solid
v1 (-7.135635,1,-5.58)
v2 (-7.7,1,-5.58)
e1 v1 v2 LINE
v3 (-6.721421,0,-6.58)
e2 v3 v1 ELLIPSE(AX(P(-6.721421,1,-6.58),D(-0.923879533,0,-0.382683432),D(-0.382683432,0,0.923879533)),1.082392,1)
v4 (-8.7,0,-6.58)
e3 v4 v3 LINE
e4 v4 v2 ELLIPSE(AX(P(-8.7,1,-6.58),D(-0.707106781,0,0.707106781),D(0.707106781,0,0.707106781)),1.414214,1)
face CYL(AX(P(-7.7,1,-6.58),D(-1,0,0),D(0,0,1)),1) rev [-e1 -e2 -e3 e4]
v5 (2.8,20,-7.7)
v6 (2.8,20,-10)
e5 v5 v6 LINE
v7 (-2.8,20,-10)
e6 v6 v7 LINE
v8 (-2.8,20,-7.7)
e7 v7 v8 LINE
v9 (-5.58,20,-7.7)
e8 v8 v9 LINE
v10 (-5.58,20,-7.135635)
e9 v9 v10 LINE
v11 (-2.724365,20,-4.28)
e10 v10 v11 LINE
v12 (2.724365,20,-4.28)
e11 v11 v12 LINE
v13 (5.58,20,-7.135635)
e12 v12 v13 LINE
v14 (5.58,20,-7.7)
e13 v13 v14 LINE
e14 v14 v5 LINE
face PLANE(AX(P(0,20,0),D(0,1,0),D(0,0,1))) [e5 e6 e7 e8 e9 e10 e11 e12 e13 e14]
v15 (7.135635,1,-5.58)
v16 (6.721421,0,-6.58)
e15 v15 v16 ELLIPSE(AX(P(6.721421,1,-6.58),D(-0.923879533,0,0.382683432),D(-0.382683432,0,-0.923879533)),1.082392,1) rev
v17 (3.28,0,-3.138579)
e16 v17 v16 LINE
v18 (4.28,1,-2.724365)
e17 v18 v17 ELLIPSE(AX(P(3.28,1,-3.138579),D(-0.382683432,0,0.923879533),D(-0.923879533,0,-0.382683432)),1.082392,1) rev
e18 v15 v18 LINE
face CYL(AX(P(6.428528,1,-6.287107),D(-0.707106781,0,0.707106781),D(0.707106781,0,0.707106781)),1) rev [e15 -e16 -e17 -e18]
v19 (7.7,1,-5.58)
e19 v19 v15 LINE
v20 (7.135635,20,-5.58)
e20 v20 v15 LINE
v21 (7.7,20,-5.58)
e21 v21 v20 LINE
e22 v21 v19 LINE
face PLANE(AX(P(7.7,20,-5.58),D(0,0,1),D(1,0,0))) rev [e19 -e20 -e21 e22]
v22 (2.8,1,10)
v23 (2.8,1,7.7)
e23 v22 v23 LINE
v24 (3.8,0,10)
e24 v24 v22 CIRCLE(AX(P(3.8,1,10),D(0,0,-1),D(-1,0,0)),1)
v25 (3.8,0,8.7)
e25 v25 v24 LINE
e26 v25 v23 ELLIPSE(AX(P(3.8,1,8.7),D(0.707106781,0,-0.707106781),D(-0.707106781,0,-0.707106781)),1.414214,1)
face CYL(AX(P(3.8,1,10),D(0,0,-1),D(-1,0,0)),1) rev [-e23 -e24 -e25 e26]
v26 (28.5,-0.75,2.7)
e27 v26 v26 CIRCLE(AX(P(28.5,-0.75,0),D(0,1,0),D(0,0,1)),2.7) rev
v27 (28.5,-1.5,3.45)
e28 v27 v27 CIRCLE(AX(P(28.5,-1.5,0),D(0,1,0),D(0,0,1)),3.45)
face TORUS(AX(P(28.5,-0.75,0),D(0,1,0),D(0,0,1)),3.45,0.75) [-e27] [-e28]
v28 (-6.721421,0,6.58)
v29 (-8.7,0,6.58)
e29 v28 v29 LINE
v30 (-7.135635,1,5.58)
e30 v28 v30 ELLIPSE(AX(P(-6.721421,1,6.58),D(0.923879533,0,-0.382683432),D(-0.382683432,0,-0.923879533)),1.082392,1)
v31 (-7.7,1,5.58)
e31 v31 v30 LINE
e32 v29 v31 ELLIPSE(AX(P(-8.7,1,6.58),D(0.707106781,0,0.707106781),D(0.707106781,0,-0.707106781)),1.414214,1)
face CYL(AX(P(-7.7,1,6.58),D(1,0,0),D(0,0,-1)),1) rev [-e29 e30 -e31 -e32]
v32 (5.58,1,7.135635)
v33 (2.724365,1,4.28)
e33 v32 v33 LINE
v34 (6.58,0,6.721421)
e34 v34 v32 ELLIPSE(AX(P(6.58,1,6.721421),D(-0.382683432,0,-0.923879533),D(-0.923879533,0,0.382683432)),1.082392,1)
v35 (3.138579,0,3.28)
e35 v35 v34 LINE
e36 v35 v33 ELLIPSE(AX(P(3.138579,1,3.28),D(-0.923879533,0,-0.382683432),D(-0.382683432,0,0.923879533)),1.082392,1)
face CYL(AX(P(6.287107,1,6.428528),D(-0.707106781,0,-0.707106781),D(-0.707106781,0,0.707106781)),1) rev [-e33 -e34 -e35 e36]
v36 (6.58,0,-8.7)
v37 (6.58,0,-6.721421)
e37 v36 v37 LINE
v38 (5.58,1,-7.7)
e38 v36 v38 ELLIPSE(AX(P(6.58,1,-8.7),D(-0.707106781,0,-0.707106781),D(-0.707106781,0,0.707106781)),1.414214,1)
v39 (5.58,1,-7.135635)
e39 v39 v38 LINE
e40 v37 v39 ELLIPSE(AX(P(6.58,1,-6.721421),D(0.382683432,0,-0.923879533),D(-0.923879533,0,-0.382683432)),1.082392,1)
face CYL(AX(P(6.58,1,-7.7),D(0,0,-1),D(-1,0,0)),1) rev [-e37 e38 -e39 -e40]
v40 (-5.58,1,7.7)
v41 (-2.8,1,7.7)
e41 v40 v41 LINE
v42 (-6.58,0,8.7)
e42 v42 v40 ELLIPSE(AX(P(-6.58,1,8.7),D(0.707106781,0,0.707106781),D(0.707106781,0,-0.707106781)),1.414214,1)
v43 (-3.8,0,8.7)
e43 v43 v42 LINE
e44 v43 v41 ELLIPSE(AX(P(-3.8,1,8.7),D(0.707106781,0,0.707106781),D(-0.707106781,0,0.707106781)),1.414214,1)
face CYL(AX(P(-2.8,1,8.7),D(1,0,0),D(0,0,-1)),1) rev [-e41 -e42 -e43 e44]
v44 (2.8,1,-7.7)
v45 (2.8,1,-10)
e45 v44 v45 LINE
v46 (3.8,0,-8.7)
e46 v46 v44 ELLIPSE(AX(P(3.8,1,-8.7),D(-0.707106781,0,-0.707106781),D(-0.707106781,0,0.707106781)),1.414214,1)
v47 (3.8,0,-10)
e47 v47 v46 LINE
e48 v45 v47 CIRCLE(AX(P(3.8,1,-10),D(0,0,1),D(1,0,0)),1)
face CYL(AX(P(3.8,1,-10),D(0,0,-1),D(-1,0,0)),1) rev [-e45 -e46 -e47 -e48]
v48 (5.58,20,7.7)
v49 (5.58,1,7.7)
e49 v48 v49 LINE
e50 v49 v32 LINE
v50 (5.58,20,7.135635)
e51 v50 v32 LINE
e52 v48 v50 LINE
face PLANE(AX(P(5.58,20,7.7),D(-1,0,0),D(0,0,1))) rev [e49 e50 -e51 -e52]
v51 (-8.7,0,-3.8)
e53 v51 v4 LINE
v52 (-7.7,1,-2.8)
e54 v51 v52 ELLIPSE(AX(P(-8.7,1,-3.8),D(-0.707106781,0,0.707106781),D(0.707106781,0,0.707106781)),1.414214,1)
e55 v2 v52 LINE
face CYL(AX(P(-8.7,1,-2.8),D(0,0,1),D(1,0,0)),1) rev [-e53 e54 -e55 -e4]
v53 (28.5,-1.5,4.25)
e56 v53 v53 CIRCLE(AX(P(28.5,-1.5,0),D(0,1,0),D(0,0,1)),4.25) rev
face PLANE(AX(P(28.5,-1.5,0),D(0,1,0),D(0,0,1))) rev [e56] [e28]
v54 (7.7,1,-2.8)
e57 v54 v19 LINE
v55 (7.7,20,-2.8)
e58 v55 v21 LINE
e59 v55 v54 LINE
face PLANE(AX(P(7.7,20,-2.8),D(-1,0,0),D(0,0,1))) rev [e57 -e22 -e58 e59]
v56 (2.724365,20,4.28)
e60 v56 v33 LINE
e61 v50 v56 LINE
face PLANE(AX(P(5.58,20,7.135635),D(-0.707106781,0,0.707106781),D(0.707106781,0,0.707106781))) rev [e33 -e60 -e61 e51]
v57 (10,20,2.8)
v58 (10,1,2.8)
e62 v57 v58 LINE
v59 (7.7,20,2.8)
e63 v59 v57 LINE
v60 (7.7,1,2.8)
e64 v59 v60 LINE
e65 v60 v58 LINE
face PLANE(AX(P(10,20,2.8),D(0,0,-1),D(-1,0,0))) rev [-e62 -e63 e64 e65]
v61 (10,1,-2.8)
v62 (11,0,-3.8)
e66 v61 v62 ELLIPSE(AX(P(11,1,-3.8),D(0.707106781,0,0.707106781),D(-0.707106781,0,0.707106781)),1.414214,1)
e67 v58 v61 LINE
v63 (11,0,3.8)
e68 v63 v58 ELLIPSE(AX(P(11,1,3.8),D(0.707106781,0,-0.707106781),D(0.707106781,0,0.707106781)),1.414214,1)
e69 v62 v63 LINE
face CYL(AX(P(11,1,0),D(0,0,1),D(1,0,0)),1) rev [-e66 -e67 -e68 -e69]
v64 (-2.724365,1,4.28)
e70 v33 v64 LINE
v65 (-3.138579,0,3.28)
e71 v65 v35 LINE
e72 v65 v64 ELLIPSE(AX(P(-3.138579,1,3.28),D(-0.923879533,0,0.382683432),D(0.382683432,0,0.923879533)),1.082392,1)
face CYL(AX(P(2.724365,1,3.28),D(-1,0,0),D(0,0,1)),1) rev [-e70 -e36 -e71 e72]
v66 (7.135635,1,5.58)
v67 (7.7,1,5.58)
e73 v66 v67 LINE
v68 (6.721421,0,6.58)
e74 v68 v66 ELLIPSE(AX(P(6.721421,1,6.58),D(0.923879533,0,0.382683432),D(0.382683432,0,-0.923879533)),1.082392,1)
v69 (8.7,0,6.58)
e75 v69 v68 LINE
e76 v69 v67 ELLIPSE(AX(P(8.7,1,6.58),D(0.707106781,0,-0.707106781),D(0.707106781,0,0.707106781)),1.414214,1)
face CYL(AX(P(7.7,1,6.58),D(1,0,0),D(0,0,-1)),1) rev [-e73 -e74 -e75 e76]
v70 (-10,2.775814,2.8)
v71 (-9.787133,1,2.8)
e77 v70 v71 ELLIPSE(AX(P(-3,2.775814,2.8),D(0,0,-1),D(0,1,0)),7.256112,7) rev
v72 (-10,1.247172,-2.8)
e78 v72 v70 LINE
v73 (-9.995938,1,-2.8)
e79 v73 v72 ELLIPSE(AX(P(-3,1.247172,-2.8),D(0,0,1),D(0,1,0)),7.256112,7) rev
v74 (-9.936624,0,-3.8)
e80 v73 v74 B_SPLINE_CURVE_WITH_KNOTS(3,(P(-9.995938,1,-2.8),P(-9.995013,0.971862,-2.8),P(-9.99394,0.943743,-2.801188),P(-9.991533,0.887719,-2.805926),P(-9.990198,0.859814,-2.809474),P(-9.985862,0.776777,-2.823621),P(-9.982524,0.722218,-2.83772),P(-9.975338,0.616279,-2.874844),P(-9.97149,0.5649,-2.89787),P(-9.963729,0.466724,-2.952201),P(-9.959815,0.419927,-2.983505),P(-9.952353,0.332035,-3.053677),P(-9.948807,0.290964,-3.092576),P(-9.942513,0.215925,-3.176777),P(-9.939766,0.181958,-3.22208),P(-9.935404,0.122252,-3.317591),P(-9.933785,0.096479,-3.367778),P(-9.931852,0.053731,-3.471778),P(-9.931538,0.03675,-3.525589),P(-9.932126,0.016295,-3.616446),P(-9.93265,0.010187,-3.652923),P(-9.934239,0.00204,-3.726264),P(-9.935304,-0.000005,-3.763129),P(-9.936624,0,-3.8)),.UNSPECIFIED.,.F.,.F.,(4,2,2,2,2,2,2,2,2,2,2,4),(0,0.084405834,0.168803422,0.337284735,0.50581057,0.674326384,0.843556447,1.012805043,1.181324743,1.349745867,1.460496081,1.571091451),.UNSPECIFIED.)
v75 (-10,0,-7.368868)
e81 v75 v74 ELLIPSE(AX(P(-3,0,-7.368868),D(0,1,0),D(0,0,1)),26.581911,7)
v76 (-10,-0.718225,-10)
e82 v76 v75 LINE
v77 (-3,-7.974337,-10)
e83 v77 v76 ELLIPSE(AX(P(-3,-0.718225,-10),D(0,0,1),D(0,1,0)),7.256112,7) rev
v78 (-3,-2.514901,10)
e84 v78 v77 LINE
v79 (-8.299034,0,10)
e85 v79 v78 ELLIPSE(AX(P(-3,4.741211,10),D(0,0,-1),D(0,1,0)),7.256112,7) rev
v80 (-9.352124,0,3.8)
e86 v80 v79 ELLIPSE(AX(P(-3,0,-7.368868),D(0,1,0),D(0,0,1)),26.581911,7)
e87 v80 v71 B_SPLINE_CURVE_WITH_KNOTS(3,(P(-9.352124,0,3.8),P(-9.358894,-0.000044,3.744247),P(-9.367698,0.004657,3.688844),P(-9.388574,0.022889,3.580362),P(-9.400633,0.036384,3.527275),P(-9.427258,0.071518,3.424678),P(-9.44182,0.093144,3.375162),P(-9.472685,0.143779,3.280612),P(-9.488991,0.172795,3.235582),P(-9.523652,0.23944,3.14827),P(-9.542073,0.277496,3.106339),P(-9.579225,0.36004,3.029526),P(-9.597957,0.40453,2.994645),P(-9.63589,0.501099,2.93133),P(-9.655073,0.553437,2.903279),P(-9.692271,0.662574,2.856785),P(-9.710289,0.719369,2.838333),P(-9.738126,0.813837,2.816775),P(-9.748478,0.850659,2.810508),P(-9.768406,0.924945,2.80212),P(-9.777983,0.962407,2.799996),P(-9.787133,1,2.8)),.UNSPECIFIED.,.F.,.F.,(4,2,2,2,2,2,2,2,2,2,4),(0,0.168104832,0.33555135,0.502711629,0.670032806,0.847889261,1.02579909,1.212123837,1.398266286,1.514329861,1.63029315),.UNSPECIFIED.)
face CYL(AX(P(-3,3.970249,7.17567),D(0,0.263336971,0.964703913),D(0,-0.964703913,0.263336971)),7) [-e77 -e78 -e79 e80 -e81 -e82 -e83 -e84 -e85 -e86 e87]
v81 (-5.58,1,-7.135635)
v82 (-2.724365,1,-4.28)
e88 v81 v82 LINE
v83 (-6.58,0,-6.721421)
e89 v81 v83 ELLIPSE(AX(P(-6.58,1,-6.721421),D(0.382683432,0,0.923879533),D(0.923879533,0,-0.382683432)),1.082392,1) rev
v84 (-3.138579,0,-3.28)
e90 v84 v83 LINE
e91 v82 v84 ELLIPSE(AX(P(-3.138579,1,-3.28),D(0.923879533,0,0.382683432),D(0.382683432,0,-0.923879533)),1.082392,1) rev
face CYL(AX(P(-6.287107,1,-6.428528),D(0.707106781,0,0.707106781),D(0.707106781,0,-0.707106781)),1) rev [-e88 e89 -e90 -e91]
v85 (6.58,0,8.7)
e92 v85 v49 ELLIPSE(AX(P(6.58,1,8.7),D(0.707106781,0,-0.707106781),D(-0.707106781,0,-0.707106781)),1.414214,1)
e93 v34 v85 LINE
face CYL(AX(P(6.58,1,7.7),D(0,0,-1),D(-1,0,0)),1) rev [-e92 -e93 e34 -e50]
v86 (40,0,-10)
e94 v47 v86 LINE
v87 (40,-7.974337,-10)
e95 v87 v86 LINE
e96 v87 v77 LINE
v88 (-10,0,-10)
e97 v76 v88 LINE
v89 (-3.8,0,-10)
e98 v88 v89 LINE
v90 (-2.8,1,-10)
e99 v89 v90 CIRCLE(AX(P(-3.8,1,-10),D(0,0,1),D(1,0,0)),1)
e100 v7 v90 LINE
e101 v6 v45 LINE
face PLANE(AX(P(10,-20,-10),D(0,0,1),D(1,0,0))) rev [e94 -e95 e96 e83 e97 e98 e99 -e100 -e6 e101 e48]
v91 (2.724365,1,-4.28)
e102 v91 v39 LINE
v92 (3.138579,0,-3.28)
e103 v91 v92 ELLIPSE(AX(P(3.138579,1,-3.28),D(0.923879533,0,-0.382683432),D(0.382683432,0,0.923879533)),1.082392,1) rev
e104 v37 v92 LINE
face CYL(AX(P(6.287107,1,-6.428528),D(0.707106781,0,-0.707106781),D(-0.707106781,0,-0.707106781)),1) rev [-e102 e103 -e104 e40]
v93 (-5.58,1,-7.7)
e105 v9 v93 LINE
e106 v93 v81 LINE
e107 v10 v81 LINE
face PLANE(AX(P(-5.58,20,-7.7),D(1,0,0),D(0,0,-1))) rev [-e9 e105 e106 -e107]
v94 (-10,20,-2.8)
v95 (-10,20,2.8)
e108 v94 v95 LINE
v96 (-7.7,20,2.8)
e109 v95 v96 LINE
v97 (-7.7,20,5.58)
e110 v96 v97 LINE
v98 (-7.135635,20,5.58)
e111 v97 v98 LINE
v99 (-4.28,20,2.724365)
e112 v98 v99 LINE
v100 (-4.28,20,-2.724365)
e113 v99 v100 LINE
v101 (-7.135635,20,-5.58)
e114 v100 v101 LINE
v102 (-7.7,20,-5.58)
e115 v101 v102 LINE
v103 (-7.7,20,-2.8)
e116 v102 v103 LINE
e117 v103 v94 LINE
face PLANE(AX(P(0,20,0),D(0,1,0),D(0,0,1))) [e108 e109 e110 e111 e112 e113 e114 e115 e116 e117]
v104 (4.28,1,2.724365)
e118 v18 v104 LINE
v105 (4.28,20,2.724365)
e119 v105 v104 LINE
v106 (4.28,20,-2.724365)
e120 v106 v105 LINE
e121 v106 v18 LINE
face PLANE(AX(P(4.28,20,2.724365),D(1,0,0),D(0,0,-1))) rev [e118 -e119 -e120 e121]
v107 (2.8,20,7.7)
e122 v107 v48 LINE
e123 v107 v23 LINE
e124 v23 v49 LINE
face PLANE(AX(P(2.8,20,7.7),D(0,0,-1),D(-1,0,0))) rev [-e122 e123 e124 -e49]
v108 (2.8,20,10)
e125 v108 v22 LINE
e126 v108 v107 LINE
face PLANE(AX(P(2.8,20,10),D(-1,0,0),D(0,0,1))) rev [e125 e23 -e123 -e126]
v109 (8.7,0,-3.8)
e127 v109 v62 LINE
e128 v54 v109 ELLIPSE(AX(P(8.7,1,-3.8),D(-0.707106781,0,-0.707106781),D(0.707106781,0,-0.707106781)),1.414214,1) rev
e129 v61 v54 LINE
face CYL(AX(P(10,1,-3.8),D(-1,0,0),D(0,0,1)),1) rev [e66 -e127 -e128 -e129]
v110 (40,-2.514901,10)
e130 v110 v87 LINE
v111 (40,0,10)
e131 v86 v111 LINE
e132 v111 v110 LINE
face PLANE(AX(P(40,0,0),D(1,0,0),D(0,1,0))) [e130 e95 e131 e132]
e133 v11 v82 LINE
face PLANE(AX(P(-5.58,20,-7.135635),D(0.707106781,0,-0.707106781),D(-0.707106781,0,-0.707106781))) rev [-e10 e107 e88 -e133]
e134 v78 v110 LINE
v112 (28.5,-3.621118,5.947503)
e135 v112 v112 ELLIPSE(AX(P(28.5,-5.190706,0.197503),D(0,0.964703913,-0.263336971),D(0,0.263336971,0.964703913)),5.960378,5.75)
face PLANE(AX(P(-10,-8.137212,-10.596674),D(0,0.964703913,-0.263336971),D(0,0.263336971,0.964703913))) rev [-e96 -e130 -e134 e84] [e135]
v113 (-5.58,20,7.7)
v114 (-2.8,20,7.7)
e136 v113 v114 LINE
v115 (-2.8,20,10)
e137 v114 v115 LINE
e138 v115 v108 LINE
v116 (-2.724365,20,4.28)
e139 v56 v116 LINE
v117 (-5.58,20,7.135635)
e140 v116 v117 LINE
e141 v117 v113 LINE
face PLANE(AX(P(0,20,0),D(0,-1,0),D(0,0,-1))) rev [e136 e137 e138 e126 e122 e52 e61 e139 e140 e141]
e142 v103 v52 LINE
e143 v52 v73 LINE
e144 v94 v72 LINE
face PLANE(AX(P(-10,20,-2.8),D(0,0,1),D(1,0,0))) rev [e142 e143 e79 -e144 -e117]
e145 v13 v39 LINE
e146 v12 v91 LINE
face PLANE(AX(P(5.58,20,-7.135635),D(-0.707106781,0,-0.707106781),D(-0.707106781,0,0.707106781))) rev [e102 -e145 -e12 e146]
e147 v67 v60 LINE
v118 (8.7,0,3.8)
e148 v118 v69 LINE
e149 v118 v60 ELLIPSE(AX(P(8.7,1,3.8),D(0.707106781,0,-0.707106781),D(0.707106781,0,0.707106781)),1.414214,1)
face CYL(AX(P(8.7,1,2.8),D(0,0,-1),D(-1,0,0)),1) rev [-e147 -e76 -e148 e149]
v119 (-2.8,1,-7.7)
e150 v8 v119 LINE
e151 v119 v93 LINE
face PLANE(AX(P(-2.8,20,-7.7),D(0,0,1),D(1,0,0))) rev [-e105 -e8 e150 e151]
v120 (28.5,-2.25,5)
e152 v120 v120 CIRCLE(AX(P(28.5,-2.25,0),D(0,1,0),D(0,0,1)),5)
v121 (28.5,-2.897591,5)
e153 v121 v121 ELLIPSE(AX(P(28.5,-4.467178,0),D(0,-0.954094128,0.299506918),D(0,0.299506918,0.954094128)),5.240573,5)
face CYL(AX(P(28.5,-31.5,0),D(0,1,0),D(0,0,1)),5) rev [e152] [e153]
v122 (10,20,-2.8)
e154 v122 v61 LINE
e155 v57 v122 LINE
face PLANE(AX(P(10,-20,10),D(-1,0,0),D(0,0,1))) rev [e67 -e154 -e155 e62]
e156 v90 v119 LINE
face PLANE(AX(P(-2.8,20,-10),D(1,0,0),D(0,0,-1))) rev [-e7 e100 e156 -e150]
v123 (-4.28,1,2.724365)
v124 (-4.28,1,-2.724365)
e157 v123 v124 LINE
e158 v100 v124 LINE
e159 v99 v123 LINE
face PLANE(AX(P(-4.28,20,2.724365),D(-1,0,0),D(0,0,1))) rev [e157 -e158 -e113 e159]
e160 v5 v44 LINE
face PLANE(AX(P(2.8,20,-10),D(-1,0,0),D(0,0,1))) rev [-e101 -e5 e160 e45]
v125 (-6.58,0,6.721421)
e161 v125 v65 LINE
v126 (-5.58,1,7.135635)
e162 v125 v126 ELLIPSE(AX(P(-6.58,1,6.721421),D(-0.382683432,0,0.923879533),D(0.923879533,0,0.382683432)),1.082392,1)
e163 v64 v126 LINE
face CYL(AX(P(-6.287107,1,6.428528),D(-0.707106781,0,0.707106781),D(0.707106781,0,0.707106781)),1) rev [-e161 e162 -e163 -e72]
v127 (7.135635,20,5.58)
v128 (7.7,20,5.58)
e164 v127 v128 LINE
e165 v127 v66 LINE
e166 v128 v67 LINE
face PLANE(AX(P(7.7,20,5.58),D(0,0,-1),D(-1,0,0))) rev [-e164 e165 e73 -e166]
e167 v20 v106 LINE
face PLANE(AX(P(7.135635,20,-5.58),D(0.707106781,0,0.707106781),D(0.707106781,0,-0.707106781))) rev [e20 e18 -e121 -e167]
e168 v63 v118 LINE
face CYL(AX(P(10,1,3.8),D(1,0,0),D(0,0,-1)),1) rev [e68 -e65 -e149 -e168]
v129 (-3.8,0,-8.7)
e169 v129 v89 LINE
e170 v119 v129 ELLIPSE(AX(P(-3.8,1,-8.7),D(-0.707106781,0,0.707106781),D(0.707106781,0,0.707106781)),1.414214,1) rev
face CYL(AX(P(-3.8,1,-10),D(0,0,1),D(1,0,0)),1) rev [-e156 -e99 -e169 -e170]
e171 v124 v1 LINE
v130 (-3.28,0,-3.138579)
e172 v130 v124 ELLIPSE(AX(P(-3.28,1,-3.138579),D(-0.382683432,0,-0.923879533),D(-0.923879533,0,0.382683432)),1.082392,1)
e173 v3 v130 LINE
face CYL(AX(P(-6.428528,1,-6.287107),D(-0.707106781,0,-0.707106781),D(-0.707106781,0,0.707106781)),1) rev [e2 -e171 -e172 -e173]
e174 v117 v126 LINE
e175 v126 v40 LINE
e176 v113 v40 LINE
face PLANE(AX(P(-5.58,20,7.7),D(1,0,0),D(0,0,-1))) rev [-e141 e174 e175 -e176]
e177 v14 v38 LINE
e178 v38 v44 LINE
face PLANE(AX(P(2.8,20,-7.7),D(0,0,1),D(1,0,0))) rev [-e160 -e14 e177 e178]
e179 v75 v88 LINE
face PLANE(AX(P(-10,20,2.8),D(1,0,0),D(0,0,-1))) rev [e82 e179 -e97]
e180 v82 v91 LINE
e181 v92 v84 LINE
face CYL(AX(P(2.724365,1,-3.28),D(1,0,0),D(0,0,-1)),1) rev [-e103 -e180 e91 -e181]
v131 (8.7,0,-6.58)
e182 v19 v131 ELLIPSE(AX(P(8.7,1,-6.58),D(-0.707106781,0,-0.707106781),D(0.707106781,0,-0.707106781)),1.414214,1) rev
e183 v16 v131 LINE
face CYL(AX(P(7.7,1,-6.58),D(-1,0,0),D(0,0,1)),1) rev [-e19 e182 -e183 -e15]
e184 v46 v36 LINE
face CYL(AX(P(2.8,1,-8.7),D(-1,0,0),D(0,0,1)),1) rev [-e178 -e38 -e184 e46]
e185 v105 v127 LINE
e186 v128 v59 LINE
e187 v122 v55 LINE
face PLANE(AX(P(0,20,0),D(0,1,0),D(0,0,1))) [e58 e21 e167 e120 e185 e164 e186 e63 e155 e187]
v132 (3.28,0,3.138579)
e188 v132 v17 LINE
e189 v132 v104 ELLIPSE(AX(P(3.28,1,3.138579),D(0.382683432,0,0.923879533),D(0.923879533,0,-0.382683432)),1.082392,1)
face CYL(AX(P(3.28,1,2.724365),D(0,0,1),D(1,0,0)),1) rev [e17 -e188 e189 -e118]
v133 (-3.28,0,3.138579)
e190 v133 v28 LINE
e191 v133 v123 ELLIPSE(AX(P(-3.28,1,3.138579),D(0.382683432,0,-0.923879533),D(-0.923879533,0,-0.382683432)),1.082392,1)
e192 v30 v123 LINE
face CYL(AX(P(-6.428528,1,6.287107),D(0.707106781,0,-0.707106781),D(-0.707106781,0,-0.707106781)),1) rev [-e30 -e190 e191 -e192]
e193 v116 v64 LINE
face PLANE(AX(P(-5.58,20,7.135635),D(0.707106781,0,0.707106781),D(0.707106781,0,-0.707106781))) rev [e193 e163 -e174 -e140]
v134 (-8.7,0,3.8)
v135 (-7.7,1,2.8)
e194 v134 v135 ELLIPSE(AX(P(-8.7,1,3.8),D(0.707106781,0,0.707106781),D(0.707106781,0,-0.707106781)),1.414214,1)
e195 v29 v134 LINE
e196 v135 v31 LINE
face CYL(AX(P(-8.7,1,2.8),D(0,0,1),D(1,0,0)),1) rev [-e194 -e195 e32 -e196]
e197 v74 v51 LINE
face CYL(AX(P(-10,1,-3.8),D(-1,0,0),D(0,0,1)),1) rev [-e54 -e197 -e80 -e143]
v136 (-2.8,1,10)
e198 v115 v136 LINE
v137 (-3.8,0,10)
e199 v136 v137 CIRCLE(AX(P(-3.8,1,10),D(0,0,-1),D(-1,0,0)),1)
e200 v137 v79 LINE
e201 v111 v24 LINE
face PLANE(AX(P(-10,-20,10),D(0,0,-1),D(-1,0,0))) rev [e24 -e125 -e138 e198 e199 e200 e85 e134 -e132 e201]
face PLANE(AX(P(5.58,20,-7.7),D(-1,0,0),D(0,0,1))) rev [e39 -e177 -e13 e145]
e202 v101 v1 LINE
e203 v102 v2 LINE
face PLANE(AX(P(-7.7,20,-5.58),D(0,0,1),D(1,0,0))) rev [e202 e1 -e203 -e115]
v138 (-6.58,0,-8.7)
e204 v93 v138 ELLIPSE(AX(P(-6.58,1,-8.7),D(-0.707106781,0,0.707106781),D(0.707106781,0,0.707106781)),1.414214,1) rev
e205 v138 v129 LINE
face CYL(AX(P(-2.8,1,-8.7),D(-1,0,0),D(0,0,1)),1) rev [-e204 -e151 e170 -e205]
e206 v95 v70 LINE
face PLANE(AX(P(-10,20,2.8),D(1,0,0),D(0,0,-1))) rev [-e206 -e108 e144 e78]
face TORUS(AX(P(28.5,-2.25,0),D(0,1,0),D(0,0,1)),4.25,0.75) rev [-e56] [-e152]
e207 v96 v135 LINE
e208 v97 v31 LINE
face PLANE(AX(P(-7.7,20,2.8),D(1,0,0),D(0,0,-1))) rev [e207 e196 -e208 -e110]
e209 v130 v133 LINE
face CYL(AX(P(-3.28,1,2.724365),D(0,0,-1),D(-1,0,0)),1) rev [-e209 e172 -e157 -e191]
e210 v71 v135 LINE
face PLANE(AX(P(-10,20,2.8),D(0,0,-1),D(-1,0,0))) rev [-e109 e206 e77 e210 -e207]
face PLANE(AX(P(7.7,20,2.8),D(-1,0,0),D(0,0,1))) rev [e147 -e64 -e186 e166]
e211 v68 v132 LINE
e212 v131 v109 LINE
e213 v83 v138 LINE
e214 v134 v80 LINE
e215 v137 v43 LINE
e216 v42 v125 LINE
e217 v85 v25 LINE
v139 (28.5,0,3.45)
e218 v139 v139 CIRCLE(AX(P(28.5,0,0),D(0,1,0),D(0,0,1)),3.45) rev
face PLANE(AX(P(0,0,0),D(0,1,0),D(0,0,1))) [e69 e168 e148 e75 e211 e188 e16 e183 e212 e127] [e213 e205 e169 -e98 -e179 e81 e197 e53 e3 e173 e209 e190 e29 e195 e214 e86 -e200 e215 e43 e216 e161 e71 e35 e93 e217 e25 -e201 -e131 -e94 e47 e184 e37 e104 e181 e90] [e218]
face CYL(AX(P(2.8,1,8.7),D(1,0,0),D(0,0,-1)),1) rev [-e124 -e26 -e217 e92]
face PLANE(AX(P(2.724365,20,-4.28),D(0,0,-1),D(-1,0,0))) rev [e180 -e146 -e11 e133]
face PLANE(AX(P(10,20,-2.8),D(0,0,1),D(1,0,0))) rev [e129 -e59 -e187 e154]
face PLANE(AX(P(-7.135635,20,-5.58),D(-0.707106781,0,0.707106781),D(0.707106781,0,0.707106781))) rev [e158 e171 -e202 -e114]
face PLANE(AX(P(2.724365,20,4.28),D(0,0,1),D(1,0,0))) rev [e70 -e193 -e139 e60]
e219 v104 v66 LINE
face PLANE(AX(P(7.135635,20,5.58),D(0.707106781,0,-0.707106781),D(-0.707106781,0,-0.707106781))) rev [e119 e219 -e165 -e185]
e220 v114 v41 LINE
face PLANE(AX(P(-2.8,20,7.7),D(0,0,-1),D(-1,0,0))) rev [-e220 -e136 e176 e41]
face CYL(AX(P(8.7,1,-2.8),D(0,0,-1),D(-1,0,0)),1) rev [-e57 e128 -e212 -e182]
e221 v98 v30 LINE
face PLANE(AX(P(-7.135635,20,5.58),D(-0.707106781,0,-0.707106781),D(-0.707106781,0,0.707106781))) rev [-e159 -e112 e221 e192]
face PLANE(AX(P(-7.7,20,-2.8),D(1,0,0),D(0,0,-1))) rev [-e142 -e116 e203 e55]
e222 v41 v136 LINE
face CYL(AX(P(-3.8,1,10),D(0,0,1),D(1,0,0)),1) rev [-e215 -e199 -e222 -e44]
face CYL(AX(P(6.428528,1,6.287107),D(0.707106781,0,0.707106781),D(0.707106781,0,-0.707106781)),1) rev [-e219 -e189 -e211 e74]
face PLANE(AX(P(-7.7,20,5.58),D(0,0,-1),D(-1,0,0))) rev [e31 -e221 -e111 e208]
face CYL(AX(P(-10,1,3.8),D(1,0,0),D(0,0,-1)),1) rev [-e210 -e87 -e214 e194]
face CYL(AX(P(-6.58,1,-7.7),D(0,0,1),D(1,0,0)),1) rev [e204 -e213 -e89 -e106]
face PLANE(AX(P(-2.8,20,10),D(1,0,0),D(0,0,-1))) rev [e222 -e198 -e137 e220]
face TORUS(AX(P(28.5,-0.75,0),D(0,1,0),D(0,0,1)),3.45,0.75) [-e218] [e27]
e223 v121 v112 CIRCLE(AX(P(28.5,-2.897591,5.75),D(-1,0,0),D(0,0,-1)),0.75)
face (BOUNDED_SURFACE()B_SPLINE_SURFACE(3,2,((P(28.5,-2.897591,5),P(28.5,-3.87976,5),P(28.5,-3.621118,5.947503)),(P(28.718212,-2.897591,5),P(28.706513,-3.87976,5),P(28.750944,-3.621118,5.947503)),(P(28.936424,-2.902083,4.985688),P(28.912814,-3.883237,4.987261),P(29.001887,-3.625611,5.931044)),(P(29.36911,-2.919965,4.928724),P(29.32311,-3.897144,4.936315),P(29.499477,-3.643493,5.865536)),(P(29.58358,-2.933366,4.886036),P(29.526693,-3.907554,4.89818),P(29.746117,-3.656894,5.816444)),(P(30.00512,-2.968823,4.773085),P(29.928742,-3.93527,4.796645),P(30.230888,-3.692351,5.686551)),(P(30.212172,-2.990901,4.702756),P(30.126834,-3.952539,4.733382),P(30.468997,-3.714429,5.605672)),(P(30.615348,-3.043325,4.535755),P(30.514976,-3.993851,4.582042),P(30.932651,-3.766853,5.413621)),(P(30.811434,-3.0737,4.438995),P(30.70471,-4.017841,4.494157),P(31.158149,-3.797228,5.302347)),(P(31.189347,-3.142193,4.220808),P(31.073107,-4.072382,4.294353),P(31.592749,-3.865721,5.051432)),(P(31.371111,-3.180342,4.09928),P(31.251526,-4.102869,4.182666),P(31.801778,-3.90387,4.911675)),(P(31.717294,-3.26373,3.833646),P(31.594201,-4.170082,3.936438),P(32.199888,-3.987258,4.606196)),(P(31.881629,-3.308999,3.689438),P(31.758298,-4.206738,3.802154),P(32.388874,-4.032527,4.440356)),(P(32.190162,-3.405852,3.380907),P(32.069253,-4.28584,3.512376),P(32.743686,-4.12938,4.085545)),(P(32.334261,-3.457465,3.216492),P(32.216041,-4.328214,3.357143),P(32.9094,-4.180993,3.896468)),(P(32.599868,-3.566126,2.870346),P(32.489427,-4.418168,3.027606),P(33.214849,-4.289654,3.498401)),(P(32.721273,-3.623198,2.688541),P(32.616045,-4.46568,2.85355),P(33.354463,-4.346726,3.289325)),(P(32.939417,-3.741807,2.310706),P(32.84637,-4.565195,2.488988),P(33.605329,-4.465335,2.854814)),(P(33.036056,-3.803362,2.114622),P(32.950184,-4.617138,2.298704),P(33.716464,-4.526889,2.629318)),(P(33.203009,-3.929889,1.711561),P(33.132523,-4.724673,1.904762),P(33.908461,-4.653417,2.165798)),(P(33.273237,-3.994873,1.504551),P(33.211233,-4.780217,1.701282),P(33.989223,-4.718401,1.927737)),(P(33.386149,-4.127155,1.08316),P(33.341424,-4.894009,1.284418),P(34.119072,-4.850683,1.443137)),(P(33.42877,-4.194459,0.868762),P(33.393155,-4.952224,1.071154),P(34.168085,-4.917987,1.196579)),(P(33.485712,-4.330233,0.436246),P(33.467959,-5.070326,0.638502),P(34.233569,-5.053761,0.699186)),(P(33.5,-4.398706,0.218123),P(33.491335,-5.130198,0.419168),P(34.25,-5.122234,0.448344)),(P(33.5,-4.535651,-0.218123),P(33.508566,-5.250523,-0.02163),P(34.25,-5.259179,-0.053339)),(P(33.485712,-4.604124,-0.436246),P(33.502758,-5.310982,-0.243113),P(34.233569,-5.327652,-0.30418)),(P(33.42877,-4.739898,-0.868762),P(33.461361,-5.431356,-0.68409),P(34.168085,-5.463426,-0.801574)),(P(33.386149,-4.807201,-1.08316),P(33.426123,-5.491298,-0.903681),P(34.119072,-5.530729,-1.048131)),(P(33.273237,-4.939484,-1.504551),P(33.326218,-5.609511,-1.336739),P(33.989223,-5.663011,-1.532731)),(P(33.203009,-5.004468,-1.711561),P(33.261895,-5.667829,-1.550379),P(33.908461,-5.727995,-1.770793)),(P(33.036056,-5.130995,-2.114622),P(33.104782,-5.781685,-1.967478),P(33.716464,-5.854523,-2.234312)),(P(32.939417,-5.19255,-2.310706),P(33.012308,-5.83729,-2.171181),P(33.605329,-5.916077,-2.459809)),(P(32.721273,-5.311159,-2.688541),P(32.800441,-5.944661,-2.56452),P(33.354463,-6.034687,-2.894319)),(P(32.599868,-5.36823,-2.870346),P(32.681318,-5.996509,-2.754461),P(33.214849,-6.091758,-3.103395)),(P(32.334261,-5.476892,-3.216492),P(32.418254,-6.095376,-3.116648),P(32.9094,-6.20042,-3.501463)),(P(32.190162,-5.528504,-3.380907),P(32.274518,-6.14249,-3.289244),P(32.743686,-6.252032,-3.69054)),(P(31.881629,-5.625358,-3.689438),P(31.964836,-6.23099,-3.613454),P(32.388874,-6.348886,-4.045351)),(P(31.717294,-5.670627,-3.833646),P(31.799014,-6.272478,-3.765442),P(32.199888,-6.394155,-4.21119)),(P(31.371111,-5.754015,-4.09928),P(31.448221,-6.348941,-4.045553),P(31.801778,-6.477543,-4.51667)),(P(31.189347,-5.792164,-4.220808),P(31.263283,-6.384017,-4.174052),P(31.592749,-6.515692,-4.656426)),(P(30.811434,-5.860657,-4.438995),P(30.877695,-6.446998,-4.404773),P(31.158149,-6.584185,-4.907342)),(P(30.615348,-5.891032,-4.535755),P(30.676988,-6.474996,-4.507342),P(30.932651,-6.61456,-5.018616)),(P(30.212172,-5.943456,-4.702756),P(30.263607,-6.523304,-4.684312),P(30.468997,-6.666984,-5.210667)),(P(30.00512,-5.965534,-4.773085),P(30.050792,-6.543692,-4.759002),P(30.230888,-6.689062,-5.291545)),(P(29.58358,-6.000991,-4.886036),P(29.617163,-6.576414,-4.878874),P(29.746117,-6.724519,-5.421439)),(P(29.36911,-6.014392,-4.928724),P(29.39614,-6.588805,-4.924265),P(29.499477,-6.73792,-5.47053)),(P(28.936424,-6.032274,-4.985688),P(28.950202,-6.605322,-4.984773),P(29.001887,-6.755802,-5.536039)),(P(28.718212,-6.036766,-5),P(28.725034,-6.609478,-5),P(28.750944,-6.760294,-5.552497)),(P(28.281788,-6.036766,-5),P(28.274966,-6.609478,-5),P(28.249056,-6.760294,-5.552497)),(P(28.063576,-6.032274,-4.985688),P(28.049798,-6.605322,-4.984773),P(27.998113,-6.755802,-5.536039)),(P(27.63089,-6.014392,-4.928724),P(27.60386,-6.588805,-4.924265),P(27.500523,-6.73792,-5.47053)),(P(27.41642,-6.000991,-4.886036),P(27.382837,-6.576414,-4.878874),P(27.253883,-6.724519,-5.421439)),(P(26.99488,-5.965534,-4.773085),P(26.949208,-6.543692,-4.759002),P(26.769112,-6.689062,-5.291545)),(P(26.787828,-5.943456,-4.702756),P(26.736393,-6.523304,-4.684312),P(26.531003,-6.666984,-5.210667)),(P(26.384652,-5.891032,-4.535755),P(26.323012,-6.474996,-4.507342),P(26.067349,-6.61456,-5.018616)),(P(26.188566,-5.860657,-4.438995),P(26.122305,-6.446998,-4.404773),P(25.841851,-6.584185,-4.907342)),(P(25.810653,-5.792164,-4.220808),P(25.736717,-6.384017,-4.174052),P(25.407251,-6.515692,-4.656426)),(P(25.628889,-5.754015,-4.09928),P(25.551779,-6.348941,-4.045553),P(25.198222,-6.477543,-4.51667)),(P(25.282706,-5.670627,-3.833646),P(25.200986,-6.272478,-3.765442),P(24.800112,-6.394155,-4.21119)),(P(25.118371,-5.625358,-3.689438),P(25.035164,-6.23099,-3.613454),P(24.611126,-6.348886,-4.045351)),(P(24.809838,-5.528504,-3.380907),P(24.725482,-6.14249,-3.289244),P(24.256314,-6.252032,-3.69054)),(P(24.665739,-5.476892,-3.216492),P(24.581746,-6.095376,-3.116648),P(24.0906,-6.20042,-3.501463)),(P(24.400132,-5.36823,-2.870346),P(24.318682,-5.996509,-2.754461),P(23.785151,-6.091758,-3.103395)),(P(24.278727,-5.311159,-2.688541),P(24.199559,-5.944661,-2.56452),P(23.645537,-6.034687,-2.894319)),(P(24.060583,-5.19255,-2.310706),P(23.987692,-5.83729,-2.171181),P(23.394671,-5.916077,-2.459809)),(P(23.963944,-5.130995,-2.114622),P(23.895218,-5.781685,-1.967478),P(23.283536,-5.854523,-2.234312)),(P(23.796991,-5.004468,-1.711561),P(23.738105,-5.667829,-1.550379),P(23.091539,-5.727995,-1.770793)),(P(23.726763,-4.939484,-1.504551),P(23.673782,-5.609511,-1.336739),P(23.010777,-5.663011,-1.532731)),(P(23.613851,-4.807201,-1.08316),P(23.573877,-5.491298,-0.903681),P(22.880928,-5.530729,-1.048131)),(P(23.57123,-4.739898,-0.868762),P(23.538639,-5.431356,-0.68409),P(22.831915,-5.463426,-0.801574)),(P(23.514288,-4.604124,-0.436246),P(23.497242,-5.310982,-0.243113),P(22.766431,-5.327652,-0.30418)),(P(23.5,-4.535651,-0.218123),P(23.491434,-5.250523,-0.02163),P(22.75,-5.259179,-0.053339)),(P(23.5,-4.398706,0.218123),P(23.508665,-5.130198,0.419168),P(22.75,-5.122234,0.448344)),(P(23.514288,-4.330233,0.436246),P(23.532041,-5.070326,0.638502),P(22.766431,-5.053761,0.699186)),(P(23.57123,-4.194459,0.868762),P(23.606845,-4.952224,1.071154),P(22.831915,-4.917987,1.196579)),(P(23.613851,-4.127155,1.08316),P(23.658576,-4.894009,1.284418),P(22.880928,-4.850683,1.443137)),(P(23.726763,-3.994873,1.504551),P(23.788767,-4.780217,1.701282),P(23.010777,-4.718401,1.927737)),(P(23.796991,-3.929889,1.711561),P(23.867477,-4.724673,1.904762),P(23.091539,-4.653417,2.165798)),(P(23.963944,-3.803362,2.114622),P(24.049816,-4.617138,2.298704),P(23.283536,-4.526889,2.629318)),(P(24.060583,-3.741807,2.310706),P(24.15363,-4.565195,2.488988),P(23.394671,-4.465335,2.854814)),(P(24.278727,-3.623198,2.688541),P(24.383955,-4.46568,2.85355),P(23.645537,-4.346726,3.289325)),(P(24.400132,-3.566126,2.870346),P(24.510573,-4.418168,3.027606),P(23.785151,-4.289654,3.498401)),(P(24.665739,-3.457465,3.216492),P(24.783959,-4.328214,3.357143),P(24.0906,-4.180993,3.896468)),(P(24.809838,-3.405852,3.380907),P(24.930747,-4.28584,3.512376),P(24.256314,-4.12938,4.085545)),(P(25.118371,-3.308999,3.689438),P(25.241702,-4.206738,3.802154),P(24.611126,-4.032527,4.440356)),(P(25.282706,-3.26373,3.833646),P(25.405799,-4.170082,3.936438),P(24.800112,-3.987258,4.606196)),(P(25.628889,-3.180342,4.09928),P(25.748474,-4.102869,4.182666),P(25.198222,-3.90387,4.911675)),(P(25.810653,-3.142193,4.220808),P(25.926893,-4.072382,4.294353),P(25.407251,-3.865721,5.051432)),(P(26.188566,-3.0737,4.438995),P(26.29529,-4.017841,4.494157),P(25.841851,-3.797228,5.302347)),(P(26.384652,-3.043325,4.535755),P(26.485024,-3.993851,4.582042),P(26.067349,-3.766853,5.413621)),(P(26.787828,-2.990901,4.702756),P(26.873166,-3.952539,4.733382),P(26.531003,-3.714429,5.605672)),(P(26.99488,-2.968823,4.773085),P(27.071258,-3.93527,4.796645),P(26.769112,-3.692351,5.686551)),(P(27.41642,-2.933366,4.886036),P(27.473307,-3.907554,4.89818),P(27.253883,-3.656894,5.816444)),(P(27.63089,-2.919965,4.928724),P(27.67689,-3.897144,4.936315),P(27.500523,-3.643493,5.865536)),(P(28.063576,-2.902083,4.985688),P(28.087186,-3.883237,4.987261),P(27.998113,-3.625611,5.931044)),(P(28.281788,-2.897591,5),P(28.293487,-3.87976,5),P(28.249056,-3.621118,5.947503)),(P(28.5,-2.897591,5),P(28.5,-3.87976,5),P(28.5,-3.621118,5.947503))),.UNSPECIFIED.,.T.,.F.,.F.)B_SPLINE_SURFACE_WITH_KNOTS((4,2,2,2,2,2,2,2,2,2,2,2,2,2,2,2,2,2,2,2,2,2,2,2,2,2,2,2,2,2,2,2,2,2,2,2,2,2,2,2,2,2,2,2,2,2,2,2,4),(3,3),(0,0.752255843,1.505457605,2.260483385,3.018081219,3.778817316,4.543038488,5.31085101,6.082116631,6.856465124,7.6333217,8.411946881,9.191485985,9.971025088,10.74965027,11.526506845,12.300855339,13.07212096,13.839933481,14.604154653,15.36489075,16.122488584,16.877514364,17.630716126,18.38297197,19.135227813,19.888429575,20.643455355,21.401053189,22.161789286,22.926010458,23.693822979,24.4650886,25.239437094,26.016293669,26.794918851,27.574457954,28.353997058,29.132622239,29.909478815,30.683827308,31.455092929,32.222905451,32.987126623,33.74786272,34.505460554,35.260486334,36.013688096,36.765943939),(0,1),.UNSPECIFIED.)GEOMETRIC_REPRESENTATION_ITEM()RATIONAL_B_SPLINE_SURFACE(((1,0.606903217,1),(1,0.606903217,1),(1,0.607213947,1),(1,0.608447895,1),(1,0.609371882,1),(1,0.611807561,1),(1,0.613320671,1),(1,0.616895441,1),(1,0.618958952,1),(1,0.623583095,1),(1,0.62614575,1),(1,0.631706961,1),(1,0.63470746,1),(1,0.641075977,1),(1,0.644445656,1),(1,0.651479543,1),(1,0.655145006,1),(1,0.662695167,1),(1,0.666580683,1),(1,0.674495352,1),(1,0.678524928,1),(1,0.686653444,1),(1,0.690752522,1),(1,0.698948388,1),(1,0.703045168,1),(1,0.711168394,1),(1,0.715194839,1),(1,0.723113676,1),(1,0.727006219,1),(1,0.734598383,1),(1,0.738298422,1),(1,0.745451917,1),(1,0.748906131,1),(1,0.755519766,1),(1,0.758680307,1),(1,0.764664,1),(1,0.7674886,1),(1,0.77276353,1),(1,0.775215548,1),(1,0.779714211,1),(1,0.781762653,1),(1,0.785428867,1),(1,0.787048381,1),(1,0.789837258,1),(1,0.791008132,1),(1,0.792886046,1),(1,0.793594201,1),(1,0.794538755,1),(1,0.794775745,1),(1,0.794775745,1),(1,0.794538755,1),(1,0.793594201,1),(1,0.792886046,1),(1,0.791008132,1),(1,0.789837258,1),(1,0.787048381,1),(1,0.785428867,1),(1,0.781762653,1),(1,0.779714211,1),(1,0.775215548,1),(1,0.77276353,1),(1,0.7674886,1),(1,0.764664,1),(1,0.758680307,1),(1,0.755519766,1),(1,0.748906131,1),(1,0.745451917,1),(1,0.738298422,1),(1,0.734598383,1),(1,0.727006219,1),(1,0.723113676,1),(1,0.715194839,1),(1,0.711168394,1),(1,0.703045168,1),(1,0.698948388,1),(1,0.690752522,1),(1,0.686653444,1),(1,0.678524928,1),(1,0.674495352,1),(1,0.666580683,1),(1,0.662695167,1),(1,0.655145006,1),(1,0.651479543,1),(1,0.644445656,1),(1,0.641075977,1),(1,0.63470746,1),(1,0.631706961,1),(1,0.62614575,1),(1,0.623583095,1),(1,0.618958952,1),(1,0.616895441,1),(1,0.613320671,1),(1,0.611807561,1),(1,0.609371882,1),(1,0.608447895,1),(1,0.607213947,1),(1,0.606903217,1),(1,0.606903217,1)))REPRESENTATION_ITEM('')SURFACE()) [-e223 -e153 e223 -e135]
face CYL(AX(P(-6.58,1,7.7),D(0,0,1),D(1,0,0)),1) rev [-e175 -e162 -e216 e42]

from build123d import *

# Parameters (mm, degrees)
BOSS_EXTRUDE1_DEPTH   = 20
BOSS_EXTRUDE1_2_DEPTH = 20
BOSS_EXTRUDE1_3_DEPTH = 20
BOSS_EXTRUDE1_4_DEPTH = 20
SKETCH2_W             = 20
SKETCH2_H             = 20
BOSS_EXTRUDE2_DEPTH   = 20
CUT_EXTRUDE1_DEPTH    = 31
BOSS_EXTRUDE3_DEPTH   = 30
SKETCH5_R             = 2.7
CUT_EXTRUDE2_DEPTH    = 30
SKETCH6_R             = 5
CUT_EXTRUDE3_DEPTH    = 30
FILLET1_R             = 7
FILLET3_R             = 1
FILLET4_R             = 0.75


# Some blends are built 0.0001 mm under size
with BuildPart() as part:
    # Sketch1 → Boss-Extrude1 (new body)
    with BuildSketch(Plane(origin=(0, 0, 0), x_dir=(1, 0, 0), z_dir=(0, 1, 0))):
        Polygon((-10, -2.8), (-10, 2.8), (-7.7, 2.8), (-7.7, 5.58), (-7.135634919, 5.58), (-4.28, 2.724365081), (-4.28, -2.724365081), (-7.135634919, -5.58), (-7.7, -5.58), (-7.7, -2.8), align=None)
    extrude(amount=BOSS_EXTRUDE1_DEPTH)



with BuildPart() as body_2:
    # Sketch1 → Boss-Extrude1 2 (new body)
    with BuildSketch(Plane(origin=(0, 0, 0), x_dir=(1, 0, 0), z_dir=(0, 1, 0))):
        Polygon((10, 2.8), (7.7, 2.8), (7.7, 5.58), (7.135634919, 5.58), (4.28, 2.724365081), (4.28, -2.724365081), (7.135634919, -5.58), (7.7, -5.58), (7.7, -2.8), (10, -2.8), align=None)
    extrude(amount=BOSS_EXTRUDE1_2_DEPTH)


with BuildPart() as body_3:
    # Sketch1 → Boss-Extrude1 3 (new body)
    with BuildSketch(Plane(origin=(0, 0, 0), x_dir=(1, 0, 0), z_dir=(0, 1, 0))):
        Polygon((2.8, -10), (-2.8, -10), (-2.8, -7.7), (-5.58, -7.7), (-5.58, -7.135634919), (-2.724365081, -4.28), (2.724365081, -4.28), (5.58, -7.135634919), (5.58, -7.7), (2.8, -7.7), align=None)
    extrude(amount=BOSS_EXTRUDE1_3_DEPTH)


with BuildPart() as body_4:
    # Sketch1 → Boss-Extrude1 4 (new body)
    with BuildSketch(Plane(origin=(0, 0, 0), x_dir=(1, 0, 0), z_dir=(0, 1, 0))):
        Polygon((-2.8, 10), (-2.8, 7.7), (-5.58, 7.7), (-5.58, 7.135634919), (-2.724365081, 4.28), (2.724365081, 4.28), (5.58, 7.135634919), (5.58, 7.7), (2.8, 7.7), (2.8, 10), align=None)
    extrude(amount=BOSS_EXTRUDE1_4_DEPTH)


with BuildPart() as part_1:
    add(part.part)

    add(body_2.part)  # Boss-Extrude2 merges body 2

    add(body_3.part)  # Boss-Extrude2 merges body 3

    add(body_4.part)  # Boss-Extrude2 merges body 4
    # Sketch2 → Boss-Extrude2 (add)
    with BuildSketch(Plane.XZ):
        Rectangle(SKETCH2_W, SKETCH2_H)
    extrude(amount=BOSS_EXTRUDE2_DEPTH)

    # Sketch3 → Cut-Extrude1 (cut, through all)
    with BuildSketch(Plane(origin=(10, 0, 0), x_dir=(0, 0, -1), z_dir=(1, 0, 0))):
        Polygon((10.596673941, -8.137212268), (10.596673941, -38.345549702), (-10.411138478, -38.345549702), (-10.411138478, -2.402671747), align=None)
    extrude(amount=-CUT_EXTRUDE1_DEPTH, mode=Mode.SUBTRACT)

    # Sketch4 → Boss-Extrude3 (add)
    with BuildSketch(Plane(origin=(10, 0, 0), x_dir=(0, 0, -1), z_dir=(1, 0, 0))):
        Polygon((10, -7.974337104), (10, 0), (-10, 0), (-10, -2.51490096), align=None)
    extrude(amount=BOSS_EXTRUDE3_DEPTH)

    # Sketch5 → Cut-Extrude2 (cut)
    with BuildSketch(Plane(origin=(0, 0, 0), x_dir=(1, 0, 0), z_dir=(0, 1, 0))):
        with Locations(Location((28.5, 0, 0), (0, 0, 270))):
            Circle(SKETCH5_R)
    extrude(amount=-CUT_EXTRUDE2_DEPTH, mode=Mode.SUBTRACT)

    # Sketch6 → Cut-Extrude3 (cut)
    with BuildSketch(Plane(origin=(0, -1.5, 0), x_dir=(1, 0, 0), z_dir=(0, 1, 0))):
        with Locations(Location((28.5, 0, 0), (0, 0, 270))):
            Circle(SKETCH6_R)
    extrude(amount=-CUT_EXTRUDE3_DEPTH, mode=Mode.SUBTRACT)

    # Fillet1
    # the kernel refuses this fillet: 7 mm, written as the material it takes off along each edge
    with BuildSketch(Plane(origin=(-10, -12.582734088, -26.882318479), x_dir=(0, 0.9647039130954433, -0.26333697054978655), z_dir=(0, 0.26333697054978655, 0.9647039130954435))) as fillet1_piece_1:
        with BuildLine():
            CenterArc((FILLET1_R, -FILLET1_R), FILLET1_R, 90, 90)
            Line((0, -FILLET1_R), (0, 0))
            Line((0, 0), (FILLET1_R, 0))
        make_face()
    extrude(amount=55.731749637, mode=Mode.SUBTRACT)

    # Fillet3
    fillet3_edges = [part_1.edges().sort_by_distance(p)[0] for p in [
        (4.152182541, 0, -5.707817459),
        (5.58, 0, -7.417817459),
        (4.19, 0, -7.7),
        (2.8, 0, -8.85),
        (-2.8, 0, -8.85),
        (-4.19, 0, -7.7),
        (-5.58, 0, -7.417817459),
        (-4.152182541, 0, -5.707817459),
        (0, 0, -4.28),
        (4.28, 0, 0),
        (5.707817459, 0, -4.152182541),
        (7.417817459, 0, -5.58),
        (7.7, 0, -4.19),
        (8.85, 0, -2.8),
        (10, 0, 0),
        (8.85, 0, 2.8),
        (7.7, 0, 4.19),
        (5.707817459, 0, 4.152182541),
        (7.417817459, 0, 5.58),
        (2.8, 0, 8.85),
        (4.19, 0, 7.7),
        (5.58, 0, 7.417817459),
        (4.152182541, 0, 5.707817459),
        (0, 0, 4.28),
        (-4.152182541, 0, 5.707817459),
        (-5.58, 0, 7.417817459),
        (-2.8, 0, 8.85),
        (-4.19, 0, 7.7),
        (-8.583774042, 0, 2.8),
        (-7.7, 0, 4.19),
        (-7.417817459, 0, 5.58),
        (-5.707817459, 0, 4.152182541),
        (-4.28, 0, 0),
        (-5.707817459, 0, -4.152182541),
        (-7.417817459, 0, -5.58),
        (-7.7, 0, -4.19),
        (-8.79791333, 0, -2.8),
    ]]
    fillet(fillet3_edges, radius=FILLET3_R)

    # Fillet4
    fillet4_edges = [part_1.edges().sort_by_distance(p)[0] for p in [
        (28.5, 0, -2.7),
        (28.5, -6.609478068, -5),
        (28.5, -1.5, -5),
        (28.5, -1.5, -2.7),
    ]]
    fillet(fillet4_edges, radius=FILLET4_R - 0.0001)  # a hair under: the kernel refuses the full size


solid = part_1.part
